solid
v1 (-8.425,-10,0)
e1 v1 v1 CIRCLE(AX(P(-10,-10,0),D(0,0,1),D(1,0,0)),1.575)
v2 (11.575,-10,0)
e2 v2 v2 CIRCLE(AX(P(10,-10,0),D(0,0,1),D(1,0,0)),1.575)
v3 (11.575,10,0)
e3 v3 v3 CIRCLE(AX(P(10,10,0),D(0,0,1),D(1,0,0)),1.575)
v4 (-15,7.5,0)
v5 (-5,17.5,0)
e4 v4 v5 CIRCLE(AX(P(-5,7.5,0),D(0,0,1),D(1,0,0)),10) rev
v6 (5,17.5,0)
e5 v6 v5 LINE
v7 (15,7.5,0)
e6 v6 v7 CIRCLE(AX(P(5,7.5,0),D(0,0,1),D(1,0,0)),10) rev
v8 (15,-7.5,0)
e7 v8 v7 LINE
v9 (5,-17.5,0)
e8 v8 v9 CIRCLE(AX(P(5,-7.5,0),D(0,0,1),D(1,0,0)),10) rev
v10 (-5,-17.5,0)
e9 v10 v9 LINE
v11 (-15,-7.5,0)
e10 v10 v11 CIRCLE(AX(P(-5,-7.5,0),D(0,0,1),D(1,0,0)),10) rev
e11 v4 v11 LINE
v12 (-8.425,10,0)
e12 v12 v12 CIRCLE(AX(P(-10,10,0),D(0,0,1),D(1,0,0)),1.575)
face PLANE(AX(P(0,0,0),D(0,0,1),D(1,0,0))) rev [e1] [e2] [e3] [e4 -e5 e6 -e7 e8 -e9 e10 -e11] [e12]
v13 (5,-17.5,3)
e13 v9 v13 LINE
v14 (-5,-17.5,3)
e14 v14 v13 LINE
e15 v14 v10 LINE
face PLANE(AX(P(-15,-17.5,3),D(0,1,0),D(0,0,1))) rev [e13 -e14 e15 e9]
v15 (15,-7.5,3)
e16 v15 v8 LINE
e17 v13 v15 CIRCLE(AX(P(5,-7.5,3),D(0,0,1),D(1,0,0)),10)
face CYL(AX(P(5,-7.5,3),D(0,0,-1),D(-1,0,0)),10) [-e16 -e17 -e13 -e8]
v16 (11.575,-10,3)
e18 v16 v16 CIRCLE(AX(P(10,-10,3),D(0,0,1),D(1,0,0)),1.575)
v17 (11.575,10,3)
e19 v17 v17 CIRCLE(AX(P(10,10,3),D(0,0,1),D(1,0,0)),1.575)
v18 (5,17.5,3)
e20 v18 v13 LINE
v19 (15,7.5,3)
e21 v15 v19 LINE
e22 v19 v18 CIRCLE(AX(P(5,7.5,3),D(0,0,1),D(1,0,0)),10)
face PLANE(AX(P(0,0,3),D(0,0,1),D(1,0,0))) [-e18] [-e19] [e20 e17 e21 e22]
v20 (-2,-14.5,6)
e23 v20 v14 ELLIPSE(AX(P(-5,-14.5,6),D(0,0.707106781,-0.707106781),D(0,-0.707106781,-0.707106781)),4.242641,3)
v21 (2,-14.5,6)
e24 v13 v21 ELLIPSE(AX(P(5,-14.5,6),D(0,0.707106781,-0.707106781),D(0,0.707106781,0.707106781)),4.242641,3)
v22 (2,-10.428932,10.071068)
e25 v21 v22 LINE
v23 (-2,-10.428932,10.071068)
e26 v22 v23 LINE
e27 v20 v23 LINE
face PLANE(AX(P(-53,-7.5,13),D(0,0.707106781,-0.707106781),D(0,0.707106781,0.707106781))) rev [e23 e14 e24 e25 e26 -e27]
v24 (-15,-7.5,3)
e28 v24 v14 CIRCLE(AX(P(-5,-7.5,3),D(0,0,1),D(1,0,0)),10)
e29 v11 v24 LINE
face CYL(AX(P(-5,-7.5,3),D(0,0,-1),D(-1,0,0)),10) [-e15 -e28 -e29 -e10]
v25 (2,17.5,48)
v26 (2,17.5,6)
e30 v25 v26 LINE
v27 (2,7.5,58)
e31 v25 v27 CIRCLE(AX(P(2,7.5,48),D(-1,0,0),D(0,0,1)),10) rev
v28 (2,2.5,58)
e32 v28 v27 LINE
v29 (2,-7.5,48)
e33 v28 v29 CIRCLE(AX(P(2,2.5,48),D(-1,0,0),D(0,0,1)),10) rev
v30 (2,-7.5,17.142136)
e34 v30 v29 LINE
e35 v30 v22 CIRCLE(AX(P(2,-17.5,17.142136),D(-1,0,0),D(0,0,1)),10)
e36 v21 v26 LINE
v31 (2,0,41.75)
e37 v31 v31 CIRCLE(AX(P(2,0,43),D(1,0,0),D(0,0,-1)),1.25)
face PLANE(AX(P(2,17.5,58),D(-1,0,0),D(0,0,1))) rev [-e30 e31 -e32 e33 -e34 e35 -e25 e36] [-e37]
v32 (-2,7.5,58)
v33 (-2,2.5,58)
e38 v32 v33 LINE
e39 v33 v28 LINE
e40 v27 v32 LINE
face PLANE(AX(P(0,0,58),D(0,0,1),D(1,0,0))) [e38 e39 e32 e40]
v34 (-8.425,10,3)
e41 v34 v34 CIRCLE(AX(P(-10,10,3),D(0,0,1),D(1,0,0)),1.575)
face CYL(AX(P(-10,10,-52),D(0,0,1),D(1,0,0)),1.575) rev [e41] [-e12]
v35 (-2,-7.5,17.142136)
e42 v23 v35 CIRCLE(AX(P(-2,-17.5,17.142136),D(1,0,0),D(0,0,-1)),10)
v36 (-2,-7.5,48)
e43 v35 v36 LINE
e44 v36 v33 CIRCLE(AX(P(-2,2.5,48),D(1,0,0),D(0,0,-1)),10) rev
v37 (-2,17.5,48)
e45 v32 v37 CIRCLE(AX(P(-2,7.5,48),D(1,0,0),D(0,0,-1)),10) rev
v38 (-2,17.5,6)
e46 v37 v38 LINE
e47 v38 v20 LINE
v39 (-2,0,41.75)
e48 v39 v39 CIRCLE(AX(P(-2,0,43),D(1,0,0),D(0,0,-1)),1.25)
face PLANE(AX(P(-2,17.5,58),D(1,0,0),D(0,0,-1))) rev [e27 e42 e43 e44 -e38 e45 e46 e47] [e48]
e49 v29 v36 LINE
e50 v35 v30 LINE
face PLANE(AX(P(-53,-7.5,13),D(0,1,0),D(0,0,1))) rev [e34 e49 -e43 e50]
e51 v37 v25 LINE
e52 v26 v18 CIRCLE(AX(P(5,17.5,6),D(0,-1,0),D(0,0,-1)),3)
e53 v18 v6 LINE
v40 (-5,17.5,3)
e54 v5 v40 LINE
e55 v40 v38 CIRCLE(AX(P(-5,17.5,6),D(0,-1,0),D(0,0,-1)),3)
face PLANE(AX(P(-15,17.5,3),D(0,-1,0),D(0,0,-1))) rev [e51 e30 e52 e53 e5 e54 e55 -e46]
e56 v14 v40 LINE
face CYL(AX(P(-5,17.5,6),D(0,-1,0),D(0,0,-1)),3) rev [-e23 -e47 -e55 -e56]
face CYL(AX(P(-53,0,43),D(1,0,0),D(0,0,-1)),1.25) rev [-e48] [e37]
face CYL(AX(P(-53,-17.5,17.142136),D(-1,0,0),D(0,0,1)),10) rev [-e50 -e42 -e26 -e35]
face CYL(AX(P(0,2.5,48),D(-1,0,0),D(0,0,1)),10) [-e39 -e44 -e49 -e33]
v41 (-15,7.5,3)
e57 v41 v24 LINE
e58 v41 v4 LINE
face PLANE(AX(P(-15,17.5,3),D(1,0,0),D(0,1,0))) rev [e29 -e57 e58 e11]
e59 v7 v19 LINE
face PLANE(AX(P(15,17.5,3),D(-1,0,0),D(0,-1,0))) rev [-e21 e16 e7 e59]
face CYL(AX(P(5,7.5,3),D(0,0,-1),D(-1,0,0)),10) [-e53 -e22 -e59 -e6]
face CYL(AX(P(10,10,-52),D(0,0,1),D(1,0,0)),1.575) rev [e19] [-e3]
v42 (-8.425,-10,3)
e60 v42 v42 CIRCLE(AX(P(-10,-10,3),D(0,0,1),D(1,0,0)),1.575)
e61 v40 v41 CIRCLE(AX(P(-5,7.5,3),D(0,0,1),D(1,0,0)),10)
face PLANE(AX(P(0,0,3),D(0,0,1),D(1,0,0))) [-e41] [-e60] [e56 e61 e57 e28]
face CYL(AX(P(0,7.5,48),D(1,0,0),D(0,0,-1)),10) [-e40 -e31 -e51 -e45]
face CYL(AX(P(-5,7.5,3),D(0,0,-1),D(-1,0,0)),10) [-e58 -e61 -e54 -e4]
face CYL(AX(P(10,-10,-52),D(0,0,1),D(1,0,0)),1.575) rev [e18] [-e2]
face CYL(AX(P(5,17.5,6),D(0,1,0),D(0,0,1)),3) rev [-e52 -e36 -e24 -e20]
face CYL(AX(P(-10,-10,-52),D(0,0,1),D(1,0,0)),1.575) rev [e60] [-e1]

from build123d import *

# Parameters (mm, degrees)
SKETCH1_W           = 30
SKETCH1_H           = 35
BOSS_EXTRUDE1_DEPTH = 3
SKETCH2_W           = 4
SKETCH2_H           = 35
BOSS_EXTRUDE2_DEPTH = 55
FILLET1_R           = 10
FILLET2_R           = 10
SKETCH3_R           = 1.575
CUT_EXTRUDE1_DEPTH  = 55
SKETCH4_R           = 1.25
CUT_EXTRUDE2_DEPTH  = 55
SKETCH5_W           = 53.614570856
SKETCH5_H           = 10
CUT_EXTRUDE3_DEPTH  = 55
FILLET3_R           = 10
CUT_EXTRUDE4_DEPTH  = 55
FILLET4_R           = 10
FILLET5_R           = 3


with BuildPart() as part:
    # Sketch1 → Boss-Extrude1 (new body)
    with BuildSketch(Plane.XY):
        Rectangle(SKETCH1_W, SKETCH1_H)
    extrude(amount=BOSS_EXTRUDE1_DEPTH)

    # Sketch2 → Boss-Extrude2 (add)
    with BuildSketch(Plane.XY.offset(3)):
        Rectangle(SKETCH2_W, SKETCH2_H)
    extrude(amount=BOSS_EXTRUDE2_DEPTH)

    # Fillet1
    fillet1_edges = [part.edges().sort_by_distance(p)[0] for p in [
        (0, 17.5, 58),
        (0, -17.5, 58),
    ]]
    fillet(fillet1_edges, radius=FILLET1_R)

    # Fillet2
    fillet2_edges = [part.edges().sort_by_distance(p)[0] for p in [
        (15, -17.5, 1.5),
        (-15, -17.5, 1.5),
        (-15, 17.5, 1.5),
        (15, 17.5, 1.5),
    ]]
    fillet(fillet2_edges, radius=FILLET2_R)

    # Sketch3 → Cut-Extrude1 (cut)
    with BuildSketch(Plane.XY.offset(3)):
        with Locations((-10, 10)):
            Circle(SKETCH3_R)
        with Locations((10, -10)):
            Circle(SKETCH3_R)
        with Locations((10, 10)):
            Circle(SKETCH3_R)
        with Locations((-10, -10)):
            Circle(SKETCH3_R)
    extrude(amount=-CUT_EXTRUDE1_DEPTH, mode=Mode.SUBTRACT)

    # Sketch4 → Cut-Extrude2 (cut)
    with BuildSketch(Plane(origin=(2, 0, 0), x_dir=(0, 0, -1), z_dir=(1, 0, 0))):
        with Locations((-43, 0)):
            Circle(SKETCH4_R)
    extrude(amount=-CUT_EXTRUDE2_DEPTH, mode=Mode.SUBTRACT)

    # Sketch5 → Cut-Extrude3 (cut)
    with BuildSketch(Plane(origin=(2, 0, 0), x_dir=(0, 0, -1), z_dir=(1, 0, 0))):
        with Locations((-39.807285428, -12.5)):
            Rectangle(SKETCH5_W, SKETCH5_H)
    extrude(amount=-CUT_EXTRUDE3_DEPTH, mode=Mode.SUBTRACT)

    # Fillet3
    fillet3_edges = [part.edges().sort_by_distance(p)[0] for p in [
        (0, -7.5, 58),
    ]]
    fillet(fillet3_edges, radius=FILLET3_R)

    # Sketch6 → Cut-Extrude4 (cut)
    with BuildSketch(Plane(origin=(2, 0, 0), x_dir=(0, 0, -1), z_dir=(1, 0, 0))):
        Polygon((-13, -7.5), (-3, -17.5), (-13, -17.5), align=None)
    extrude(amount=-CUT_EXTRUDE4_DEPTH, mode=Mode.SUBTRACT)

    # Fillet4
    fillet4_edges = [part.edges().sort_by_distance(p)[0] for p in [
        (0, -7.5, 13),
    ]]
    fillet(fillet4_edges, radius=FILLET4_R)

    # Fillet5
    fillet5_edges = [part.edges().sort_by_distance(p)[0] for p in [
        (2, 0, 3),
        (-2, 0, 3),
    ]]
    fillet(fillet5_edges, radius=FILLET5_R - 0.0001)  # a hair under: the kernel refuses the full size


solid = part.part
